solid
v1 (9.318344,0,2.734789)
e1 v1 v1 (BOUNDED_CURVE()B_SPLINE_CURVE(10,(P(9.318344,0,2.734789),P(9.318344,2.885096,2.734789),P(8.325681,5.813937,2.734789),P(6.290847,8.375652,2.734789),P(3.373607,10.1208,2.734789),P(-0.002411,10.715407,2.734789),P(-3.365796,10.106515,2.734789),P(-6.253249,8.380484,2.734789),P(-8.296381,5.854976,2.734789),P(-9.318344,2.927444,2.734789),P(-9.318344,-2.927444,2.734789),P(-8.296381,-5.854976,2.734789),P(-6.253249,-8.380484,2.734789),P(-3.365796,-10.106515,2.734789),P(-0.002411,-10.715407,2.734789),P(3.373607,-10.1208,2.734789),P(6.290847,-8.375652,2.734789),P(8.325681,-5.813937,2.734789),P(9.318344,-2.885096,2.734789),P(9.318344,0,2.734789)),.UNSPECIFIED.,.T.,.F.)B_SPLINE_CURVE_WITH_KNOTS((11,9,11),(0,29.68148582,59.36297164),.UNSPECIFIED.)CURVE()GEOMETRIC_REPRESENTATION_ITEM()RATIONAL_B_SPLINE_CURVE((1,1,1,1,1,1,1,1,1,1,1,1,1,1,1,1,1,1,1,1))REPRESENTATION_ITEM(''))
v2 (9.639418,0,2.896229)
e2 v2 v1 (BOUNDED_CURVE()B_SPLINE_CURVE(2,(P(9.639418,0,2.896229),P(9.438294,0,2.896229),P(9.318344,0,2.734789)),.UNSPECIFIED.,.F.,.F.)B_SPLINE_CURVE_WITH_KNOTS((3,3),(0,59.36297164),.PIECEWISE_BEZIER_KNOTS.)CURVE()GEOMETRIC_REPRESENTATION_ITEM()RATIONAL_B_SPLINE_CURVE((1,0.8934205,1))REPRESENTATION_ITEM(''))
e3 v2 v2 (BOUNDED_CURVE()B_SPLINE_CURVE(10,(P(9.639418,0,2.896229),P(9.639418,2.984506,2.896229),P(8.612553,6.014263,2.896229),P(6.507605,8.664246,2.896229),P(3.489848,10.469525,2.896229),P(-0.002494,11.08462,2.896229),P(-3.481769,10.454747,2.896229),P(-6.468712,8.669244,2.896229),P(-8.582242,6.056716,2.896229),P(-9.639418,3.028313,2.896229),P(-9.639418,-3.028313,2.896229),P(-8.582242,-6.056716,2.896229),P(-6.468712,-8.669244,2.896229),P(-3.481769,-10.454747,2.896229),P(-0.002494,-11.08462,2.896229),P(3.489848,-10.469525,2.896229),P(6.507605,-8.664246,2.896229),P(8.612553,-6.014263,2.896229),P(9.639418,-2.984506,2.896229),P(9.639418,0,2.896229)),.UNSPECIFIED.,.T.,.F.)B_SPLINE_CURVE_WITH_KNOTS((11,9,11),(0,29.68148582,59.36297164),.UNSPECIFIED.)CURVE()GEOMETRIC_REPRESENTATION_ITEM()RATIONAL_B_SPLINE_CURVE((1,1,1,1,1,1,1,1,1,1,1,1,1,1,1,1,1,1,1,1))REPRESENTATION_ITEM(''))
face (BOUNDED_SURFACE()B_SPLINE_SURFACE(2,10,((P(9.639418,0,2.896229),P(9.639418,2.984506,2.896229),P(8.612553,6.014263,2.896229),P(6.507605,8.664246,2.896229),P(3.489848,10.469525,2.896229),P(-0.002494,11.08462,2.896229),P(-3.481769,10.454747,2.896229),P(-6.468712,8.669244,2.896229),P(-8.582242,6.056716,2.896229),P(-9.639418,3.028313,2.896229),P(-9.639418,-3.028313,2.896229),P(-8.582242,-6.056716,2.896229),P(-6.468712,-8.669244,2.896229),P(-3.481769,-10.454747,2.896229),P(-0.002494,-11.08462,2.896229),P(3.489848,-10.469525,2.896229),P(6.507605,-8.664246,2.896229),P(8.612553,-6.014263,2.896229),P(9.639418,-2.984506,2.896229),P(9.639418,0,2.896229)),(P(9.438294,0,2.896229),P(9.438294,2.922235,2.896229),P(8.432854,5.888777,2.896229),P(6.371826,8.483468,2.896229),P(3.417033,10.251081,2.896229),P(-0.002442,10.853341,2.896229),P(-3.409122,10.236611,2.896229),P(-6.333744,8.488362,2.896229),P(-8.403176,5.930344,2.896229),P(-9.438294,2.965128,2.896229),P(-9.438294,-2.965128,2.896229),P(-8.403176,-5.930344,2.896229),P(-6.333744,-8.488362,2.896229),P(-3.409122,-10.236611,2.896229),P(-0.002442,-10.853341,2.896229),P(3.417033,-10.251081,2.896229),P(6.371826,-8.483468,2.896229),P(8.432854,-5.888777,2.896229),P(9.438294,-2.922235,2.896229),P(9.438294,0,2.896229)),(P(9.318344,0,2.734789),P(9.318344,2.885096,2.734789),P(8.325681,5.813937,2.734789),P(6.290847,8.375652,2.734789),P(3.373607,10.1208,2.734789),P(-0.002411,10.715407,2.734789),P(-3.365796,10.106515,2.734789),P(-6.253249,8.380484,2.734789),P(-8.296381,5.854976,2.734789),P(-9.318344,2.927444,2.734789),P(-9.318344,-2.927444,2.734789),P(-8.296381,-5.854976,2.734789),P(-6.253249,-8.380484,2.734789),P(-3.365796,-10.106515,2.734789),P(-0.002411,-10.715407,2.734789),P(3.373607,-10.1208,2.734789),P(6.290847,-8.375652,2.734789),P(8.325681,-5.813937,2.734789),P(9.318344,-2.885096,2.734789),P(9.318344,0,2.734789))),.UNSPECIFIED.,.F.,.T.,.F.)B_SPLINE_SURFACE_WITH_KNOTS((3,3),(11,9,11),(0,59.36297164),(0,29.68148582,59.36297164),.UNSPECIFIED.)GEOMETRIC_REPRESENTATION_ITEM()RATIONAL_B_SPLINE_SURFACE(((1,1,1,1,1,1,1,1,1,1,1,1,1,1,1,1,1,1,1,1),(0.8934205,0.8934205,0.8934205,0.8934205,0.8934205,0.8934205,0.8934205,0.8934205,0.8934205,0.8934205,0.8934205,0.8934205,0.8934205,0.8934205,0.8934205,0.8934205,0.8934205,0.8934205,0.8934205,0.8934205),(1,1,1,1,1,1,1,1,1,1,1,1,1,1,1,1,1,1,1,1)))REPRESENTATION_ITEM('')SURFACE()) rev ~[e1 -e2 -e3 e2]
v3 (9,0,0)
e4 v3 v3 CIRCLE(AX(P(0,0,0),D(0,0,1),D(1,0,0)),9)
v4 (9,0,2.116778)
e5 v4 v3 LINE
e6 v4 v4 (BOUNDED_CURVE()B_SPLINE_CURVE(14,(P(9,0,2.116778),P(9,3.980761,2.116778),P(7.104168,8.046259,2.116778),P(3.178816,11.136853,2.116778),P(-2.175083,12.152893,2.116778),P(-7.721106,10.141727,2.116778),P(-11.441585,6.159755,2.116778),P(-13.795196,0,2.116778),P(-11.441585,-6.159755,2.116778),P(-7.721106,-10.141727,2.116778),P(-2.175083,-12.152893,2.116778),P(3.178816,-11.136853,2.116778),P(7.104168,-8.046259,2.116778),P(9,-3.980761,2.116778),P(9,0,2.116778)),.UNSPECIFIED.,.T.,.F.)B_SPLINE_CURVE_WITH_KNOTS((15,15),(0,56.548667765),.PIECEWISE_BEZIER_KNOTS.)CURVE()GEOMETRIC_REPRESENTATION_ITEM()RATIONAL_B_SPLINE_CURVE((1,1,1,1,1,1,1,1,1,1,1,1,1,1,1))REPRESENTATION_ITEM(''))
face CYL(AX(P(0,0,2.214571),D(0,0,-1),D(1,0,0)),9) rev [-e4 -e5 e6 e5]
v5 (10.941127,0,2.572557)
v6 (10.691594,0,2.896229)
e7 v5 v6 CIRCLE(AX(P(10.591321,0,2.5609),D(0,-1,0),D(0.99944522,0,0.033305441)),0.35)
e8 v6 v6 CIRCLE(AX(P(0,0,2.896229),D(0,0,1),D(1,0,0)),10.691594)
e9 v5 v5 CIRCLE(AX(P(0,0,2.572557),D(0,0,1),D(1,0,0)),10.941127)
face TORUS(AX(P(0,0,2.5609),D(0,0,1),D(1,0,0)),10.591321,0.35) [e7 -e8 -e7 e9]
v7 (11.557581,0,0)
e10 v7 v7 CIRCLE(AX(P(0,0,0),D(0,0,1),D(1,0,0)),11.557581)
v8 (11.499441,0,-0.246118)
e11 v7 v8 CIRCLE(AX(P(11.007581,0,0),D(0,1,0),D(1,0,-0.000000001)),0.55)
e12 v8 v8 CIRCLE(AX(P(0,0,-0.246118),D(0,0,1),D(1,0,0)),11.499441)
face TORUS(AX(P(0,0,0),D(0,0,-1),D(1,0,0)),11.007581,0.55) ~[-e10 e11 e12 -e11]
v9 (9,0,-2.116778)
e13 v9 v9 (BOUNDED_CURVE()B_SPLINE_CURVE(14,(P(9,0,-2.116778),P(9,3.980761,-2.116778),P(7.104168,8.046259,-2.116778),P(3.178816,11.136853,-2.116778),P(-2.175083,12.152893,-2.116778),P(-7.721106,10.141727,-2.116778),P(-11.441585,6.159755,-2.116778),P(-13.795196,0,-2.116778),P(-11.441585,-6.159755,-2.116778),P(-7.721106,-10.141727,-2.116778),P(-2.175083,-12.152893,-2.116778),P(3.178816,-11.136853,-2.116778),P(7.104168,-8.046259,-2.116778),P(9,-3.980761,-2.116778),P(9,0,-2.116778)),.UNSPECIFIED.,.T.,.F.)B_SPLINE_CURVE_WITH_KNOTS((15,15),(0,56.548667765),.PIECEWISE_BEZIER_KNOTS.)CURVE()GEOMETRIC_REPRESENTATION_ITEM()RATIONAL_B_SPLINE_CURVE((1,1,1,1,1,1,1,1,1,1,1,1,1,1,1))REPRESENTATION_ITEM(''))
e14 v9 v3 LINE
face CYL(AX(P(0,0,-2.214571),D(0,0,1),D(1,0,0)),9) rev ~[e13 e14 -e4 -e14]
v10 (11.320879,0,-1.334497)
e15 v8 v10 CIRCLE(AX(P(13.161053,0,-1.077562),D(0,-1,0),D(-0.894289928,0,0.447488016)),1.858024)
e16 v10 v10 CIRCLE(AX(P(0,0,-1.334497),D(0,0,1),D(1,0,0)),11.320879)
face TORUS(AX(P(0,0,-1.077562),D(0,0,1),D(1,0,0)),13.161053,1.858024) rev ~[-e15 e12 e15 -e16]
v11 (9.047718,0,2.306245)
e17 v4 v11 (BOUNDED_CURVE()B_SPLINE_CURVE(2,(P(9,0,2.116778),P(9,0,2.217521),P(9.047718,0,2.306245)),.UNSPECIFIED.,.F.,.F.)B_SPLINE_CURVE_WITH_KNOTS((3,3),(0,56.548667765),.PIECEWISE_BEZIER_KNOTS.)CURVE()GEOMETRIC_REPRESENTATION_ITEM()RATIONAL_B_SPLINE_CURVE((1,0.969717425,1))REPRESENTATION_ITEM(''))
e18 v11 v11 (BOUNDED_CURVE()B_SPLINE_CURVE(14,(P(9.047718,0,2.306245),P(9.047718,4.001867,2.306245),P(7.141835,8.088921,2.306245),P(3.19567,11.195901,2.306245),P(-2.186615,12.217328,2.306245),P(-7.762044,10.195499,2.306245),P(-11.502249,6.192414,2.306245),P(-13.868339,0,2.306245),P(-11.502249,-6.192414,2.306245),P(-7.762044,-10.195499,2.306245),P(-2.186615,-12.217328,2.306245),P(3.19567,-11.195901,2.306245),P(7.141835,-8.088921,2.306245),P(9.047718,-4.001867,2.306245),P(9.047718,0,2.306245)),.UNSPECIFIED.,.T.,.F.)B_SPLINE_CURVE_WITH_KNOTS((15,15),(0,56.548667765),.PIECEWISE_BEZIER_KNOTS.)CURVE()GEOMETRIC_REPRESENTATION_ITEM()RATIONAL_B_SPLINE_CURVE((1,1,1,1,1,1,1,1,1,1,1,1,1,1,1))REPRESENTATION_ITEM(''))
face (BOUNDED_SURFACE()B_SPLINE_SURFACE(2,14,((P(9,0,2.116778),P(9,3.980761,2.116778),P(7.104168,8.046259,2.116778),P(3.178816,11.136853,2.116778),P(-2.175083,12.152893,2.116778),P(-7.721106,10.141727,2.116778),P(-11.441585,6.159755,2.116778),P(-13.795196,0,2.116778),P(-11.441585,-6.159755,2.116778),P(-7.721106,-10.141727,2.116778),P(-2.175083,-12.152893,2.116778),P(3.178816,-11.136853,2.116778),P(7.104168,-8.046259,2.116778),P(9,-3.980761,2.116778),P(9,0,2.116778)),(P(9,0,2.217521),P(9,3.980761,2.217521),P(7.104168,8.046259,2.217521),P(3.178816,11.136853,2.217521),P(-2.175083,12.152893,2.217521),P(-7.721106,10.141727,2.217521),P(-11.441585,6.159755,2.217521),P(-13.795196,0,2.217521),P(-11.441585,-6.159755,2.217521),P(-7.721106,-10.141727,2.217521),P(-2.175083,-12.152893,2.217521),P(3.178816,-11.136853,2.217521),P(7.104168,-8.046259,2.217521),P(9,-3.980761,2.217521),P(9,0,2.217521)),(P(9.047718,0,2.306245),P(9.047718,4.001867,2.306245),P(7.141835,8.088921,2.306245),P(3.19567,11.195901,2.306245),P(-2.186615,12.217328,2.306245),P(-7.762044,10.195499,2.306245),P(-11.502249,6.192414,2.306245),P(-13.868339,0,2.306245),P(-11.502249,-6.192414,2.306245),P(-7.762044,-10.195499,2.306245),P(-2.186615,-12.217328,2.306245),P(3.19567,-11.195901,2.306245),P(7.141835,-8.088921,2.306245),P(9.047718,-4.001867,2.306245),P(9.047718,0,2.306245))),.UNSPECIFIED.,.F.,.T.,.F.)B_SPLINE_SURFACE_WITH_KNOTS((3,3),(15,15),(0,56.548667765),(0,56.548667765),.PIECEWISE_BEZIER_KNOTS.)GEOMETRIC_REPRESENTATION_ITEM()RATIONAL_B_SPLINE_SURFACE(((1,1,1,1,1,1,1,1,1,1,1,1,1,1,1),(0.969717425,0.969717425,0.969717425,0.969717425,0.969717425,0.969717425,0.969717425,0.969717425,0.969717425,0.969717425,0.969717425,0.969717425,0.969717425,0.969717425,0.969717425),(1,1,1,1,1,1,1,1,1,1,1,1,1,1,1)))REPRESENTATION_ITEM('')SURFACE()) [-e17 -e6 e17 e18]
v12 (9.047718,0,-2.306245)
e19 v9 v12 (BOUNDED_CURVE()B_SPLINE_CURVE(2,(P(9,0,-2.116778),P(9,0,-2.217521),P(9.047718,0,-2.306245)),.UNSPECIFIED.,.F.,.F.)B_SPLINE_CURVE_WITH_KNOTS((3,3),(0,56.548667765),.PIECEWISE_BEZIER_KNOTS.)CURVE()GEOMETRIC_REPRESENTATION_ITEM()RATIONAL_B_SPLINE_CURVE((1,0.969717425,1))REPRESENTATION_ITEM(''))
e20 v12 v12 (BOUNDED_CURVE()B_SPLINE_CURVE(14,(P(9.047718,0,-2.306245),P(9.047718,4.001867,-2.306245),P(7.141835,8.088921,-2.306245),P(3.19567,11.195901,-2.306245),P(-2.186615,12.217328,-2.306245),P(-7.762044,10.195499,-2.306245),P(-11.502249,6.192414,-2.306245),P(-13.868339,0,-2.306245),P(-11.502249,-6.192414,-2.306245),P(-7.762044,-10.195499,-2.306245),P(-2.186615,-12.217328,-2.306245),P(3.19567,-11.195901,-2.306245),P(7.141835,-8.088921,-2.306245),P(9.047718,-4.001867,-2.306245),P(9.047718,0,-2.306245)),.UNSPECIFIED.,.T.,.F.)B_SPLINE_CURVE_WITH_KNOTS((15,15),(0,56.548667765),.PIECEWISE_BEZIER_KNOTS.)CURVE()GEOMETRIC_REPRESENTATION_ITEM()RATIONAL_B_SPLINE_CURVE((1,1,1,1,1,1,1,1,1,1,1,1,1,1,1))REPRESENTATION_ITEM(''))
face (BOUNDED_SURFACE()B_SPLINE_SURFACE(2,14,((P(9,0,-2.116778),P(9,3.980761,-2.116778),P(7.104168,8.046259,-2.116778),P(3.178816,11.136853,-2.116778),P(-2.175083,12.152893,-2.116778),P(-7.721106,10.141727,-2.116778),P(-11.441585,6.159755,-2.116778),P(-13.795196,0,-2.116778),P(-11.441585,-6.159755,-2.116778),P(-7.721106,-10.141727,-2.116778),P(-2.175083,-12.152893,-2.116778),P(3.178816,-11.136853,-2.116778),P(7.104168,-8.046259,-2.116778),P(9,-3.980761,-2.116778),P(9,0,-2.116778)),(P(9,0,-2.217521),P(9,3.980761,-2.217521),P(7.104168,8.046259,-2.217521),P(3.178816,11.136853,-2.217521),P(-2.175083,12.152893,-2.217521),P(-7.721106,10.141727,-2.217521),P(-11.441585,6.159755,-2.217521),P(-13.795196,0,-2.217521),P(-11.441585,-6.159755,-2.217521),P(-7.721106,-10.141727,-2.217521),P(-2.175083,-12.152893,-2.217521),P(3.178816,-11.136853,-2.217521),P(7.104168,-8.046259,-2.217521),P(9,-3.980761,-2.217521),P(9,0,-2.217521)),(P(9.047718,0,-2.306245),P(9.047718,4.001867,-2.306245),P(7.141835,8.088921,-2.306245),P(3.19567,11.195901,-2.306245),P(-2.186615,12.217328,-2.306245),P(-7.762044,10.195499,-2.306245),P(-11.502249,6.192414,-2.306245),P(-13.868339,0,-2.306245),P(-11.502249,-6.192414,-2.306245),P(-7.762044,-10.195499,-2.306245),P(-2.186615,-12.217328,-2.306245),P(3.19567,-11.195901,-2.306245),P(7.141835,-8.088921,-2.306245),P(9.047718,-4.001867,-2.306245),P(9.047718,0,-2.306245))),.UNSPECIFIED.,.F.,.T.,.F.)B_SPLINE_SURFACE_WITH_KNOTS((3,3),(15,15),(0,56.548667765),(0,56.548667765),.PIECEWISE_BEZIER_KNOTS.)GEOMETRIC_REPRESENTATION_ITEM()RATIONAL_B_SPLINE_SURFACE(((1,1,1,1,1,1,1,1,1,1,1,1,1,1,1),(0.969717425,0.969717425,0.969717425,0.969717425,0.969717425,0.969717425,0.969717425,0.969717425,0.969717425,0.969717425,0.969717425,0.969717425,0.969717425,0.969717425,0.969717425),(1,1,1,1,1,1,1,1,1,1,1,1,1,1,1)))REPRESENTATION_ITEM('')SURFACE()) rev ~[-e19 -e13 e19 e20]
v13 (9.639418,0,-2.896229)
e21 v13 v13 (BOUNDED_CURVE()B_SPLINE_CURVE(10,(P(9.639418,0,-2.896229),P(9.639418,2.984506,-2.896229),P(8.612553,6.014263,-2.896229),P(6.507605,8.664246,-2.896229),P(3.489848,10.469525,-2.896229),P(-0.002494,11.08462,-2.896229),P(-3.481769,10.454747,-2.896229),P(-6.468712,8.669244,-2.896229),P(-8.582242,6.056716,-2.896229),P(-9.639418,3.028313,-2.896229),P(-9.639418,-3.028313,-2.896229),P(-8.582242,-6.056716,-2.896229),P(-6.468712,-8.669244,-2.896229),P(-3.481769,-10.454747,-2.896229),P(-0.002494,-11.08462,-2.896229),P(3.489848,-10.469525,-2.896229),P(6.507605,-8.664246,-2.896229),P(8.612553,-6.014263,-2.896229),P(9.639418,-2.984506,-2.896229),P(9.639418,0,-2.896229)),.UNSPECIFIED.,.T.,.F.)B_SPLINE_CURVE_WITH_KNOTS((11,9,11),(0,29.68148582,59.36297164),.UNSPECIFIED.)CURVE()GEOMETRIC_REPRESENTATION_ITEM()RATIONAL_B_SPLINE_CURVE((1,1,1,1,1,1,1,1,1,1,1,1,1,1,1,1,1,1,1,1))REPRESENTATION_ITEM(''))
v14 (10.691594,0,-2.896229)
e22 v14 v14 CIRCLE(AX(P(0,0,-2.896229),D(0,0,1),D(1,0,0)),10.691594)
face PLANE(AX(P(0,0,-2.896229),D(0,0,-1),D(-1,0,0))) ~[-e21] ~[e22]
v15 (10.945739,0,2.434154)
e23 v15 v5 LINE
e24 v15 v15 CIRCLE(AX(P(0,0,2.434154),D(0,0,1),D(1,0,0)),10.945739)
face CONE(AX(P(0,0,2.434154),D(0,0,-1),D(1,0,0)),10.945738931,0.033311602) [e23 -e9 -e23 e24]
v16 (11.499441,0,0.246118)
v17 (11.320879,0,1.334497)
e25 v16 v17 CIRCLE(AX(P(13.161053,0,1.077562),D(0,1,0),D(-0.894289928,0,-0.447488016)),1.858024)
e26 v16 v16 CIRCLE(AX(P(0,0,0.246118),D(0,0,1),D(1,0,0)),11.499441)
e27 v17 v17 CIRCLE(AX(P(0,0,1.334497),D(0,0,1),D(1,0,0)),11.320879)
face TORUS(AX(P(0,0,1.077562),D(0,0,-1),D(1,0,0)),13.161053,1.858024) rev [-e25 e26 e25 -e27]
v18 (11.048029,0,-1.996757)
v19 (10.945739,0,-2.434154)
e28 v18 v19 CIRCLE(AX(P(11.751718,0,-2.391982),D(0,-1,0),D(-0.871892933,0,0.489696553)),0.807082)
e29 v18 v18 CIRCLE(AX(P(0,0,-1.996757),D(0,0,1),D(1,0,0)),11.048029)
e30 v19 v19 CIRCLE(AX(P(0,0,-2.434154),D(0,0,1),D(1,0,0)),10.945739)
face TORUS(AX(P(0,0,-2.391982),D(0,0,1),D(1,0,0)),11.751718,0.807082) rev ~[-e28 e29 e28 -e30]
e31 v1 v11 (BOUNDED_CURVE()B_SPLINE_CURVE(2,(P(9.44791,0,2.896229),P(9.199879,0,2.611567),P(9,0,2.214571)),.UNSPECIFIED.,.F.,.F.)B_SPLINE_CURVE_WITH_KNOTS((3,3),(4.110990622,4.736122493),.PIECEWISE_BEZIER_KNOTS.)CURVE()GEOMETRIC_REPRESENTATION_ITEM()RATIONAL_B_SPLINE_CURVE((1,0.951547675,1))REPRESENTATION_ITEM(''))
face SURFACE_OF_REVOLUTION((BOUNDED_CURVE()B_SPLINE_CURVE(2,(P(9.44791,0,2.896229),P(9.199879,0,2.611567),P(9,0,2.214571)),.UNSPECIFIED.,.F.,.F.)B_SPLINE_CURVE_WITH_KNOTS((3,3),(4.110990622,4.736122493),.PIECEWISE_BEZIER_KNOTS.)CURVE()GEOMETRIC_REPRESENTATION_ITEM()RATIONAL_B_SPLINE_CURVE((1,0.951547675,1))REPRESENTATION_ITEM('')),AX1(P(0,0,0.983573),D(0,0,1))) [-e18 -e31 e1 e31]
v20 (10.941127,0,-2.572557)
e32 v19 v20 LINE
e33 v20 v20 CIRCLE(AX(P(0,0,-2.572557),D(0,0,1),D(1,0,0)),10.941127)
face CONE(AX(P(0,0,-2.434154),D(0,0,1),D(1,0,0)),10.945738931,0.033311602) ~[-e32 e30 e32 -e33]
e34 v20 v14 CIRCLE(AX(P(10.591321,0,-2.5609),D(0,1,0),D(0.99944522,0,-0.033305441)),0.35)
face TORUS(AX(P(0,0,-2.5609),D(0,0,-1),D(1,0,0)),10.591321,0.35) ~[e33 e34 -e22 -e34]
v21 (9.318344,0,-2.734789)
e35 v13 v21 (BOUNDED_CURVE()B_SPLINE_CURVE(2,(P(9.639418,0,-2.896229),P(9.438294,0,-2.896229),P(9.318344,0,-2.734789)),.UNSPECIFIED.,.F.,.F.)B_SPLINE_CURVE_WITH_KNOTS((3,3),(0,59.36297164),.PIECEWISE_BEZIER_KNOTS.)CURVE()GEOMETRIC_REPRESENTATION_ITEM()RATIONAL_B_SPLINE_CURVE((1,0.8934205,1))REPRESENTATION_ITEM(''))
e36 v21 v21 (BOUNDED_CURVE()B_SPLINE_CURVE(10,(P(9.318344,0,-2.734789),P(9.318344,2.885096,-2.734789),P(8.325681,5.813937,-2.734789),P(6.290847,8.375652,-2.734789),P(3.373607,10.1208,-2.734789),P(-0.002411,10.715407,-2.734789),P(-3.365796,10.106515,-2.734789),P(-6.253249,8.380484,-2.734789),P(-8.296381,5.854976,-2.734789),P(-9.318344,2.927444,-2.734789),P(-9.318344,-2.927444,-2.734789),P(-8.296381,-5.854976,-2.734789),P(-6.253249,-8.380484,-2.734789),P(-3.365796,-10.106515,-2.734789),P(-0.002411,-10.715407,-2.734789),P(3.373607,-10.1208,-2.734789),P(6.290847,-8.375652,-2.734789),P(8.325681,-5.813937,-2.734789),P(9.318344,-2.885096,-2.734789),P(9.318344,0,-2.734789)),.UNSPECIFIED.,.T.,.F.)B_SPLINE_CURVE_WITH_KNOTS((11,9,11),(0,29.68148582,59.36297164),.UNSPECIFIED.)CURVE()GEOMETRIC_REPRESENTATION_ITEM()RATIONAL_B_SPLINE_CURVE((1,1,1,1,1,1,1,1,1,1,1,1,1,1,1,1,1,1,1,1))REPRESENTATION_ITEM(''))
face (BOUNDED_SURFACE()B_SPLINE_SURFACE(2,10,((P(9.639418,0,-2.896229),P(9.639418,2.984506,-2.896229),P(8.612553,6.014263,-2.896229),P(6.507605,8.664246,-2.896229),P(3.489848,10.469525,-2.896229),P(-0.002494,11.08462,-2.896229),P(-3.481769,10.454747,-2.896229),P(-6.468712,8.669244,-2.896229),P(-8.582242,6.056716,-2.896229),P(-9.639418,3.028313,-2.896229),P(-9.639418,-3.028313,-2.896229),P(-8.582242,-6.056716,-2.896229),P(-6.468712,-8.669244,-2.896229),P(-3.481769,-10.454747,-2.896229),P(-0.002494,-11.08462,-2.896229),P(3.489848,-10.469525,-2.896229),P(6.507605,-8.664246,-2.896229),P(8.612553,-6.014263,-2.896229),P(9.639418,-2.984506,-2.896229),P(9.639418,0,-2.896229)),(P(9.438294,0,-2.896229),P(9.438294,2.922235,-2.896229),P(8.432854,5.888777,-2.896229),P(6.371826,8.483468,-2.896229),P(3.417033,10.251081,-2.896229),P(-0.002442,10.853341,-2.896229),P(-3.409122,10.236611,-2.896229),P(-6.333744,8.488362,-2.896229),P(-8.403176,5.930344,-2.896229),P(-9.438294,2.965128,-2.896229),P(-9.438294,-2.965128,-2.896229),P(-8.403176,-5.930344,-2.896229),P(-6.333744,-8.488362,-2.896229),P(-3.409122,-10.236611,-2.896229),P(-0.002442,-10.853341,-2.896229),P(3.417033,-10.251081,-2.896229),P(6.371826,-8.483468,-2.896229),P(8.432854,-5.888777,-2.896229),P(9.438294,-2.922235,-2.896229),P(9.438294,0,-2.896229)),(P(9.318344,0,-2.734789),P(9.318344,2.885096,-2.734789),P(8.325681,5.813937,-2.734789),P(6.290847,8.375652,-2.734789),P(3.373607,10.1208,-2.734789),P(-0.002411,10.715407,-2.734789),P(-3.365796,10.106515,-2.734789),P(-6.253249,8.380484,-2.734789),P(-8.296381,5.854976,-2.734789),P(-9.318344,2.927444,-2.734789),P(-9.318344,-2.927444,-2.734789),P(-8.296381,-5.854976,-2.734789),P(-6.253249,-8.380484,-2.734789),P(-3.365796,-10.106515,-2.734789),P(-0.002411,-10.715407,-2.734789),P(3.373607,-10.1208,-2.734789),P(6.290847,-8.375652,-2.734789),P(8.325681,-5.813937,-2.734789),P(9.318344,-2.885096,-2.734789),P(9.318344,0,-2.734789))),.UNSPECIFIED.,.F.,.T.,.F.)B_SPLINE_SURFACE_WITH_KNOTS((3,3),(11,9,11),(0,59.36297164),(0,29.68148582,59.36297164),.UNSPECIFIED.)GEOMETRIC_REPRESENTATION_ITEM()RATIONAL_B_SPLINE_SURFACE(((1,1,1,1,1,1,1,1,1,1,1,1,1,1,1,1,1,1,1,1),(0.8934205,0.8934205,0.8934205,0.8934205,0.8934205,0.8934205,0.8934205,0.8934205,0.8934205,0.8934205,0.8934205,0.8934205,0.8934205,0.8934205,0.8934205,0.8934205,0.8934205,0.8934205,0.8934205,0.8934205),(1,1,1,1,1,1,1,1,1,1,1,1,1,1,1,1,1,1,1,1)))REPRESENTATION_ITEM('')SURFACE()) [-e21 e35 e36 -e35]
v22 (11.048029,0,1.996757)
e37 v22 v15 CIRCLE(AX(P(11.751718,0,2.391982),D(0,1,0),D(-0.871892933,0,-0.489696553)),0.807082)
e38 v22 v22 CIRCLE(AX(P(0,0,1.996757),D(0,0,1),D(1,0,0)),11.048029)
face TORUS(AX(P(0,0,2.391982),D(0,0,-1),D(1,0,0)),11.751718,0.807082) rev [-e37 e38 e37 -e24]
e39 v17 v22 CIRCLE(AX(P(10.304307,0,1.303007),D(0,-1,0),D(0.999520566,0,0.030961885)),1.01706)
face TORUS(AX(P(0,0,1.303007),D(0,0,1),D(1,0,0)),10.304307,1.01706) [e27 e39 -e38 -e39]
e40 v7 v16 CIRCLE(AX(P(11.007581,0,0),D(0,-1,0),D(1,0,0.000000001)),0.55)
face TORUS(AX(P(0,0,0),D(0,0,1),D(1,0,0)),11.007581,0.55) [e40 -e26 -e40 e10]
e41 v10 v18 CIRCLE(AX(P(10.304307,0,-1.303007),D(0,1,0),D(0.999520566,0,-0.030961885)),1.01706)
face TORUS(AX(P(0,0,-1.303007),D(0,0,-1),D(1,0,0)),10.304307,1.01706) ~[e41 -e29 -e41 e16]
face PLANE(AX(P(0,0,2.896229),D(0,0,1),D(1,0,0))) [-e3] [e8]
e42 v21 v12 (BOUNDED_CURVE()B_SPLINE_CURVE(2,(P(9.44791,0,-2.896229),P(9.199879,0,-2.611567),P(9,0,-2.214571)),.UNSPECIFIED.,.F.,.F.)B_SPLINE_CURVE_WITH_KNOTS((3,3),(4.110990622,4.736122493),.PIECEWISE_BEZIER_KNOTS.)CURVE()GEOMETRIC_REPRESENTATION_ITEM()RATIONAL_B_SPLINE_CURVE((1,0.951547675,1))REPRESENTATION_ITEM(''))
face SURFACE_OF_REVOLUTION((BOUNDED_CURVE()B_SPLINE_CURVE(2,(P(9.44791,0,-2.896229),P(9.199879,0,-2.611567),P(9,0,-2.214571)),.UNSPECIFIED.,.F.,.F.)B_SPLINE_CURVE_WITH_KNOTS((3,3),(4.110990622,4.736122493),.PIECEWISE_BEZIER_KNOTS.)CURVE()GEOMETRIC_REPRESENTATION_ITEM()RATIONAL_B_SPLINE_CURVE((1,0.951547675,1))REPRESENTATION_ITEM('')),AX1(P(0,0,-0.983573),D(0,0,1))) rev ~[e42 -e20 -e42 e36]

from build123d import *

# Parameters (mm, degrees)
F2_R = 0.4


# Not quite as in the source:
# - a feature names something its author has since deleted; it is built from what else it names


with BuildPart() as f1:
    # F0 (on Front) → F1 (revolve)
    with BuildSketch(Plane.XZ):
        with BuildLine():
            Line((9, 2.2145714873), (9, 0))
            Line((9, 0), (11.007581126, 1e-10))
            Line((11.007581126, 1e-10), (11.557581126, 1e-10))
            ThreePointArc((11.557581126, 1e-10), (11.5428486774, 0.1264462272), (11.4994405865, 0.2461184088))
            ThreePointArc((11.4994405865, 0.2461184088), (11.3275404558, 0.776753068), (11.320879477, 1.3344971203))
            ThreePointArc((11.320879477, 1.3344971203), (11.2446825964, 1.6904409043), (11.0480292202, 1.9967567406))
            ThreePointArc((11.0480292202, 1.9967567406), (10.9658405694, 2.2081954603), (10.9457389311, 2.4341539314))
            Line((10.9457389311, 2.4341539314), (10.9411267847, 2.5725573716))
            ThreePointArc((10.9411267847, 2.5725573716), (10.8685098139, 2.774597304), (10.6915943502, 2.8962290327))
            Line((10.6915943502, 2.8962290327), (9.4479103732, 2.8962290327))
            add(Edge.make_bspline(
                [(9.4479103732, 2.8962290327), (9.1998794596, 2.6115665992), (9, 2.2145714873)],
                knots=[4.1109906217, 4.1109906217, 4.1109906217, 4.7361224927, 4.7361224927, 4.7361224927], degree=2, weights=[1, 0.9515476749, 1]))
        make_face()
    revolve(axis=Axis((0, 0, 0.9835734963), (0, 0, 1)))

    # F2
    f2_edges = [f1.edges().sort_by_distance(p)[0] for p in [
        (-9, 0, 2.214571),
        (-9.44791, 0, 2.896229),
    ]]
    fillet(f2_edges, radius=F2_R)

    # F3: F1 across plane


with BuildPart() as f1_1:
    add(f1.part)
    add(f1.part.mirror(Plane.XY))


solid = f1_1.part
